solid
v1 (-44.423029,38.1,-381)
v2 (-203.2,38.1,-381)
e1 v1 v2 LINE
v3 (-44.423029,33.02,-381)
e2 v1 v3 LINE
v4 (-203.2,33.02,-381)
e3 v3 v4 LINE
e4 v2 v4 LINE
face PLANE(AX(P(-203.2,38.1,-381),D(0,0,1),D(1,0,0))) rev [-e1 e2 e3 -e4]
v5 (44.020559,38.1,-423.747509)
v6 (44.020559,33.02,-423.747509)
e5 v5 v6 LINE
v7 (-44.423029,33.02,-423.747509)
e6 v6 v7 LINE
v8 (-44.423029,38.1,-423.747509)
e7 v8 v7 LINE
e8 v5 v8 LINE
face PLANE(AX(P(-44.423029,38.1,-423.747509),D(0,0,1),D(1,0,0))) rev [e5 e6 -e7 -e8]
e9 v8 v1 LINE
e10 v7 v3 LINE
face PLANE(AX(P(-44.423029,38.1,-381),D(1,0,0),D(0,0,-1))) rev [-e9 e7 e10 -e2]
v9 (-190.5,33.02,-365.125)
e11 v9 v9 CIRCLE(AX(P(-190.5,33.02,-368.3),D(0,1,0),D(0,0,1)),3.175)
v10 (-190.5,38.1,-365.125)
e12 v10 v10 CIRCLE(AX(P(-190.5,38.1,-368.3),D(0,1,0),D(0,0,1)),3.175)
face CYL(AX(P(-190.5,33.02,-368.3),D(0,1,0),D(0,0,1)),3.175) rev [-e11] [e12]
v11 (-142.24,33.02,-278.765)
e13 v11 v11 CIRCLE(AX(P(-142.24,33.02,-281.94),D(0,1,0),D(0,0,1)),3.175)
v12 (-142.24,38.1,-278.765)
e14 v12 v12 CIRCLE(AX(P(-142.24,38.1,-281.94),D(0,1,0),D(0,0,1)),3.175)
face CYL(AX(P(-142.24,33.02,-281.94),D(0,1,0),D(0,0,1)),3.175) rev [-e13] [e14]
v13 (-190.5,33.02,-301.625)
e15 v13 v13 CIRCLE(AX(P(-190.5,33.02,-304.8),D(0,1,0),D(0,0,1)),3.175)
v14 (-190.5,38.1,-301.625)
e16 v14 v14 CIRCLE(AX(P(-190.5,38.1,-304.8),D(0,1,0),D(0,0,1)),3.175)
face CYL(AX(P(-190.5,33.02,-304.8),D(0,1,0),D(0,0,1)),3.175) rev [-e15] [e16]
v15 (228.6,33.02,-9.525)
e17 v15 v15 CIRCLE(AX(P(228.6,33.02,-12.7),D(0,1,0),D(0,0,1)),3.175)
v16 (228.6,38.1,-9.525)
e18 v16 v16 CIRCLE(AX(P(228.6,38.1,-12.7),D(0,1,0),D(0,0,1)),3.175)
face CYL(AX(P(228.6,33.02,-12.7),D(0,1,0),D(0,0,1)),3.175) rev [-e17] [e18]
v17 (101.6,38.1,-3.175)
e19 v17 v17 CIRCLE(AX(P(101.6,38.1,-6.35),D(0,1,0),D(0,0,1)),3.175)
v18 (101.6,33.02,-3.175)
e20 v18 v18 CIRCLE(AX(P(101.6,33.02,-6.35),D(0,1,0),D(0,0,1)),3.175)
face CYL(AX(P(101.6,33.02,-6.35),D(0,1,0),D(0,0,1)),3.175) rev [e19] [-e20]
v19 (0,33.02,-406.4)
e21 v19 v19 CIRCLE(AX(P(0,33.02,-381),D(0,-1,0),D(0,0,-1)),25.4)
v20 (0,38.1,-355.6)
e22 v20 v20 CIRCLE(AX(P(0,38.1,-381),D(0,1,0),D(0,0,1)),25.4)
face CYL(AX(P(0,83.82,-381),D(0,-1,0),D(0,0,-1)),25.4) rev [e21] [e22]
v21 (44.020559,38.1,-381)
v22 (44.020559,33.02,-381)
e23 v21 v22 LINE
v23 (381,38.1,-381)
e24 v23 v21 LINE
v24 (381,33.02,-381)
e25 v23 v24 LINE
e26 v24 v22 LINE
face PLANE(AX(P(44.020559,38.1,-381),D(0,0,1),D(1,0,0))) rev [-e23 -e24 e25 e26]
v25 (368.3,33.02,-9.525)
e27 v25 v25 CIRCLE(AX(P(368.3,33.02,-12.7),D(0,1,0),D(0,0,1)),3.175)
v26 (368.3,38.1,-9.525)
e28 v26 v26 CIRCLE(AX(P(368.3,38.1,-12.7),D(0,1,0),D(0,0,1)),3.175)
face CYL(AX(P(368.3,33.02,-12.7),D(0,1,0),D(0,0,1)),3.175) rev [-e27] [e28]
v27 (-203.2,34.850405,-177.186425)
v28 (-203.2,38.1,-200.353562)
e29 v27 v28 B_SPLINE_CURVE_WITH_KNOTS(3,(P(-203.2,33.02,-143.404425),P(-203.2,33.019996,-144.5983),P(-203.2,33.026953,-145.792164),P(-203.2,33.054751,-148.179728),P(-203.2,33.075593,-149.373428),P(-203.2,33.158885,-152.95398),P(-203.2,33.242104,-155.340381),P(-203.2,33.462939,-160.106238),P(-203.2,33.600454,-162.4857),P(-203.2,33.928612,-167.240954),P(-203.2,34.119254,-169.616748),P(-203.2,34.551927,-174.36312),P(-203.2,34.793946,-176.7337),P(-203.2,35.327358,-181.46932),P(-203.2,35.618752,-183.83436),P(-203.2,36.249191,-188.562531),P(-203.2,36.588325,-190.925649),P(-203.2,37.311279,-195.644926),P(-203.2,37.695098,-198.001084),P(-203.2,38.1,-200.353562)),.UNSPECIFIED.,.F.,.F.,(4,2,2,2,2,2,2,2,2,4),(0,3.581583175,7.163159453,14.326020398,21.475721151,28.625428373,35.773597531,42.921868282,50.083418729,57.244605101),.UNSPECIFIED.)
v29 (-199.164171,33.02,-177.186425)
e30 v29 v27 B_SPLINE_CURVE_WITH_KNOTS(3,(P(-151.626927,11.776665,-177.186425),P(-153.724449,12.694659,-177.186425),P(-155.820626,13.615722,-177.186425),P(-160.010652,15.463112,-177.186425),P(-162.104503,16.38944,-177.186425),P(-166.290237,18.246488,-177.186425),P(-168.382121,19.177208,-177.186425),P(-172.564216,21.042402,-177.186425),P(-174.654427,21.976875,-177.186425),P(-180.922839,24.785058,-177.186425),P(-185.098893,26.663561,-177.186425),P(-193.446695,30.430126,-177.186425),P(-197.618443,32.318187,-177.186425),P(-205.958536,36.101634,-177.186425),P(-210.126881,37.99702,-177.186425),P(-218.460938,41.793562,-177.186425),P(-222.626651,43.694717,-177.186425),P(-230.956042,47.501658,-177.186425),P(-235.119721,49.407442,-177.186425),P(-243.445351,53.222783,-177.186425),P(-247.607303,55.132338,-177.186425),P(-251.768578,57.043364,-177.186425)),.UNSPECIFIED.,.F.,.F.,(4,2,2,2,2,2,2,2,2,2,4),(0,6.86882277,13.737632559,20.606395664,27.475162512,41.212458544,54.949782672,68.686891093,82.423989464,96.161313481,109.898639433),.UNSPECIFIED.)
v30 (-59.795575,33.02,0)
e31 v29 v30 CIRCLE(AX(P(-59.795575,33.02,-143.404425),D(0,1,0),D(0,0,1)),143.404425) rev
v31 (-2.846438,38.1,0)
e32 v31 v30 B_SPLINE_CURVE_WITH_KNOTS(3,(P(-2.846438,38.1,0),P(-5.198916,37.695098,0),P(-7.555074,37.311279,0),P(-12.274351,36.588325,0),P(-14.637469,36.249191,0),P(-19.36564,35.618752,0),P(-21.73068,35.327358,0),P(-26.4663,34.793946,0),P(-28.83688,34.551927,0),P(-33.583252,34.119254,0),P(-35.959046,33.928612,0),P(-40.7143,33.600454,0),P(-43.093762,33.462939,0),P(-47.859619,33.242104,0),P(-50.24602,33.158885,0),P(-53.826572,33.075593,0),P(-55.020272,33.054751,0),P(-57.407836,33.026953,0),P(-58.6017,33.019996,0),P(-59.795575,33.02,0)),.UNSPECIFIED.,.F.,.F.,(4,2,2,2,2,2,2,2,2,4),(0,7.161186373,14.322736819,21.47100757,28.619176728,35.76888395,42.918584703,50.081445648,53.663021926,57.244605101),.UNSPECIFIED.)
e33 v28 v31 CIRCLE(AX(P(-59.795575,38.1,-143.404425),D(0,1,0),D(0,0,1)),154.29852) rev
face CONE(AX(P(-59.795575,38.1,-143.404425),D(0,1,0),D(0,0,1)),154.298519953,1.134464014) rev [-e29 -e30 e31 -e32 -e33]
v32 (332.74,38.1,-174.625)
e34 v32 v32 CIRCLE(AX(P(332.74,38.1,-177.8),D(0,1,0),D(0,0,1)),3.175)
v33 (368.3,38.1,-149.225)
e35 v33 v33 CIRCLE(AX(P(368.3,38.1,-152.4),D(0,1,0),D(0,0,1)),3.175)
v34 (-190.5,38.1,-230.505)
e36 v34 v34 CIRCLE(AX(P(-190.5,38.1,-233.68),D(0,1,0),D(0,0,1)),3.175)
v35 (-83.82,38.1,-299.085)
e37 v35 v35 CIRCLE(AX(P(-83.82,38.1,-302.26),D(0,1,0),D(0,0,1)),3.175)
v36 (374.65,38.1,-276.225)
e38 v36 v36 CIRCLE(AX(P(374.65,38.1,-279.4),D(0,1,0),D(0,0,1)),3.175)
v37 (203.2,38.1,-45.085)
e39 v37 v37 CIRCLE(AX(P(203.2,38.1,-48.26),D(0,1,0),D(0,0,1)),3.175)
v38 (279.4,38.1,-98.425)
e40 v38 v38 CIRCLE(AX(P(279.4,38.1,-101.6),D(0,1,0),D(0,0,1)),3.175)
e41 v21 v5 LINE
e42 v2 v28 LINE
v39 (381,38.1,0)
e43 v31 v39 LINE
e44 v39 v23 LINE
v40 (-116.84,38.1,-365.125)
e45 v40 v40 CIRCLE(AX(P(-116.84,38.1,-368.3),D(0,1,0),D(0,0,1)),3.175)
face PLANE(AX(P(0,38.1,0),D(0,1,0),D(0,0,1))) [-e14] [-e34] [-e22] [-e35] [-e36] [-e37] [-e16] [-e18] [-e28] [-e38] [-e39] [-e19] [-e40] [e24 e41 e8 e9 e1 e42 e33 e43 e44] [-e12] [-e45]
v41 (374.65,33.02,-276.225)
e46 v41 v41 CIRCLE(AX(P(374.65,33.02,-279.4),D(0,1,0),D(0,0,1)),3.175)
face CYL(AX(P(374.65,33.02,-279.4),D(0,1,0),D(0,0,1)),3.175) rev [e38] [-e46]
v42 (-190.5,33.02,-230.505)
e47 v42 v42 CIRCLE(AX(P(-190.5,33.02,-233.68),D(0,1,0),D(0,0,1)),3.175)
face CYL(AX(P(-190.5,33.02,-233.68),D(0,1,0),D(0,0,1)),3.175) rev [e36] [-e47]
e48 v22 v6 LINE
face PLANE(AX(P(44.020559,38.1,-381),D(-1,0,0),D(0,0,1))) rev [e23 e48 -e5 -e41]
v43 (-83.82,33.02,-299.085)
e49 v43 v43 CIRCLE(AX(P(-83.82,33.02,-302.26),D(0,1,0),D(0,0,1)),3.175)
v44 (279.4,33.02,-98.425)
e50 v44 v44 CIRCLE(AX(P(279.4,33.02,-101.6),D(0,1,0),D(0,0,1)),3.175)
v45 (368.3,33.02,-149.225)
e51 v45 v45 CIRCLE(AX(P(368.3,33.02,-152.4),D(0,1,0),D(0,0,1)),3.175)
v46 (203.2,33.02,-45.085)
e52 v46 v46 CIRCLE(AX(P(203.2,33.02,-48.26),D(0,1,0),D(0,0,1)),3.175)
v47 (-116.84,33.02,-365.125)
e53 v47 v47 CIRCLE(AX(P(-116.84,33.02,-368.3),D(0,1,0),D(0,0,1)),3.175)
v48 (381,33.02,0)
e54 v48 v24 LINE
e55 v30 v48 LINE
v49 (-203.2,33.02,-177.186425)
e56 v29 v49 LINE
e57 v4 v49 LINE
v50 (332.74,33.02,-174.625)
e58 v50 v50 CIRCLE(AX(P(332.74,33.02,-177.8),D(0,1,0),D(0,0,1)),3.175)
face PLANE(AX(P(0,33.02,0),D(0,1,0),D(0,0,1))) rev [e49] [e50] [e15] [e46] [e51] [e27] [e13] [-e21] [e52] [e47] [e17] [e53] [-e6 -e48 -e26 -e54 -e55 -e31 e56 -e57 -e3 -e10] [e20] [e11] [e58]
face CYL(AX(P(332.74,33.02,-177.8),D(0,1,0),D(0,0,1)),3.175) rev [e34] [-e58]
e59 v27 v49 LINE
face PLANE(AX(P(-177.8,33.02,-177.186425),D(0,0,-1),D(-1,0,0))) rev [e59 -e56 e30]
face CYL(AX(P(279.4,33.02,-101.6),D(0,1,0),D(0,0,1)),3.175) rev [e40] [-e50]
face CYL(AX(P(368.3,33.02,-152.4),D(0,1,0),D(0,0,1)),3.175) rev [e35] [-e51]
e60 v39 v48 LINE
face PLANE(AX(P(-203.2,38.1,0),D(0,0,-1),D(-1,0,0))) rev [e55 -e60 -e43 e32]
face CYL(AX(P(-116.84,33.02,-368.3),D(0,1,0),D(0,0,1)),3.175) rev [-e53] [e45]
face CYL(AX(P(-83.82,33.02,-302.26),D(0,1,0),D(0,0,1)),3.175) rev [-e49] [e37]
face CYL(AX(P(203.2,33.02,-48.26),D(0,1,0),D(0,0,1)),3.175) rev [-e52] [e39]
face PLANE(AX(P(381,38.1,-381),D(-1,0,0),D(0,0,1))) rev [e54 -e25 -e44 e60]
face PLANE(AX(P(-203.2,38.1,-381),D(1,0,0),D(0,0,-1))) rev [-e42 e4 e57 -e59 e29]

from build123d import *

# Parameters (mm, degrees)
BOSS_EXTRUDE1_START = 33.02
BOSS_EXTRUDE1_DEPTH = 5.08
SKETCH4_R           = 25.4
CUT_EXTRUDE1_DEPTH  = 50.8
CUT_EXTRUDE5_START  = 5.08
SKETCH1_R           = 143.404424797
CUT_EXTRUDE5_DEPTH  = 38.1
CHAMFER1_SIZE2      = 5.08
CHAMFER1_SIZE       = 10.894095156
SKETCH6_W           = 33.782
SKETCH6_H           = 14.432407555
CUT_EXTRUDE7_DEPTH  = 25.4
SKETCH7_R           = 3.175
CUT_EXTRUDE8_DEPTH  = 5.08
SKETCH8_R           = 3.175
CUT_EXTRUDE9_DEPTH  = 5.08


with BuildPart() as part:
    # Sketch2 → Boss-Extrude1 (new body)
    with BuildSketch(Plane(origin=(0, 0, 0), x_dir=(1, 0, 0), z_dir=(0, 1, 0)).offset(BOSS_EXTRUDE1_START)):
        Polygon((-203.2, 381), (-44.423028516, 381), (-44.423028516, 423.747508854), (44.020558762, 423.747508854), (44.020558762, 381), (381, 381), (381, 0), (-203.2, 0), align=None)
    extrude(amount=BOSS_EXTRUDE1_DEPTH)

    # Sketch4 → Cut-Extrude1 (cut)
    with BuildSketch(Plane.XZ.offset(-33.02)):
        with Locations(Location((0, -381, 0), (0, 0, 270))):
            Circle(SKETCH4_R)
    extrude(amount=-CUT_EXTRUDE1_DEPTH, mode=Mode.SUBTRACT)

    # Sketch1 → Cut-Extrude5 (cut)
    with BuildSketch(Plane(origin=(0, 0, 0), x_dir=(1, 0, 0), z_dir=(0, 1, 0)).offset(CUT_EXTRUDE5_START)):
        with Locations((-59.795575203, 143.404424797)):
            Circle(SKETCH1_R)
    extrude(amount=CUT_EXTRUDE5_DEPTH, mode=Mode.SUBTRACT)


with BuildPart() as cut_extrude5_kept_piece:
    # of the separate pieces the step leaves, the one the design keeps (cut_extrude5_pieces_kept)
    add(part.part.solids().sort_by_distance((-203.2, 33.02, -381))[0])

    # Chamfer1
    chamfer1_edges = [cut_extrude5_kept_piece.edges().sort_by_distance(p)[0] for p in [
        (41.606666023, 38.1, -244.806666023),
    ]]
    chamfer1_side = [cut_extrude5_kept_piece.faces().sort_by_distance(p)[0] for p in [
        (41.678508072, 38.1, -244.878508072),
    ]]
    chamfer(chamfer1_edges, length=CHAMFER1_SIZE - 0.0001, length2=CHAMFER1_SIZE2 - 0.0001, reference=chamfer1_side[0])  # a hair under: the kernel refuses the full size

    # Sketch6 → Cut-Extrude7 (cut)
    with BuildSketch(Plane.ZY.offset(203.2)):
        with Locations((-160.295424797, 40.236203778)):
            Rectangle(SKETCH6_W, SKETCH6_H)
    extrude(amount=-CUT_EXTRUDE7_DEPTH, mode=Mode.SUBTRACT)

    # Sketch7 → Cut-Extrude8 (cut)
    with BuildSketch(Plane(origin=(0, 38.1, 0), x_dir=(1, 0, 0), z_dir=(0, 1, 0))):
        with Locations(Location((368.3, 152.4, 0), (0, 0, 270))):
            Circle(SKETCH7_R)
        with Locations(Location((374.65, 279.4, 0), (0, 0, 270))):
            Circle(SKETCH7_R)
        with Locations(Location((332.74, 177.8, 0), (0, 0, 270))):
            Circle(SKETCH7_R)
        with Locations(Location((279.4, 101.6, 0), (0, 0, 270))):
            Circle(SKETCH7_R)
        with Locations(Location((101.6, 6.35, 0), (0, 0, 270))):
            Circle(SKETCH7_R)
        with Locations(Location((203.2, 48.26, 0), (0, 0, 270))):
            Circle(SKETCH7_R)
        with Locations(Location((228.6, 12.7, 0), (0, 0, 270))):
            Circle(SKETCH7_R)
        with Locations(Location((368.3, 12.7, 0), (0, 0, 270))):
            Circle(SKETCH7_R)
    extrude(amount=-CUT_EXTRUDE8_DEPTH, mode=Mode.SUBTRACT)

    # Sketch8 → Cut-Extrude9 (cut)
    with BuildSketch(Plane(origin=(0, 38.1, 0), x_dir=(1, 0, 0), z_dir=(0, 1, 0))):
        with Locations(Location((-190.5, 368.3, 0), (0, 0, 270))):
            Circle(SKETCH8_R)
        with Locations(Location((-116.84, 368.3, 0), (0, 0, 270))):
            Circle(SKETCH8_R)
        with Locations(Location((-83.82, 302.26, 0), (0, 0, 270))):
            Circle(SKETCH8_R)
        with Locations(Location((-142.24, 281.94, 0), (0, 0, 270))):
            Circle(SKETCH8_R)
        with Locations(Location((-190.5, 304.8, 0), (0, 0, 270))):
            Circle(SKETCH8_R)
        with Locations(Location((-190.5, 233.68, 0), (0, 0, 270))):
            Circle(SKETCH8_R)
    extrude(amount=-CUT_EXTRUDE9_DEPTH, mode=Mode.SUBTRACT)


solid = cut_extrude5_kept_piece.part
